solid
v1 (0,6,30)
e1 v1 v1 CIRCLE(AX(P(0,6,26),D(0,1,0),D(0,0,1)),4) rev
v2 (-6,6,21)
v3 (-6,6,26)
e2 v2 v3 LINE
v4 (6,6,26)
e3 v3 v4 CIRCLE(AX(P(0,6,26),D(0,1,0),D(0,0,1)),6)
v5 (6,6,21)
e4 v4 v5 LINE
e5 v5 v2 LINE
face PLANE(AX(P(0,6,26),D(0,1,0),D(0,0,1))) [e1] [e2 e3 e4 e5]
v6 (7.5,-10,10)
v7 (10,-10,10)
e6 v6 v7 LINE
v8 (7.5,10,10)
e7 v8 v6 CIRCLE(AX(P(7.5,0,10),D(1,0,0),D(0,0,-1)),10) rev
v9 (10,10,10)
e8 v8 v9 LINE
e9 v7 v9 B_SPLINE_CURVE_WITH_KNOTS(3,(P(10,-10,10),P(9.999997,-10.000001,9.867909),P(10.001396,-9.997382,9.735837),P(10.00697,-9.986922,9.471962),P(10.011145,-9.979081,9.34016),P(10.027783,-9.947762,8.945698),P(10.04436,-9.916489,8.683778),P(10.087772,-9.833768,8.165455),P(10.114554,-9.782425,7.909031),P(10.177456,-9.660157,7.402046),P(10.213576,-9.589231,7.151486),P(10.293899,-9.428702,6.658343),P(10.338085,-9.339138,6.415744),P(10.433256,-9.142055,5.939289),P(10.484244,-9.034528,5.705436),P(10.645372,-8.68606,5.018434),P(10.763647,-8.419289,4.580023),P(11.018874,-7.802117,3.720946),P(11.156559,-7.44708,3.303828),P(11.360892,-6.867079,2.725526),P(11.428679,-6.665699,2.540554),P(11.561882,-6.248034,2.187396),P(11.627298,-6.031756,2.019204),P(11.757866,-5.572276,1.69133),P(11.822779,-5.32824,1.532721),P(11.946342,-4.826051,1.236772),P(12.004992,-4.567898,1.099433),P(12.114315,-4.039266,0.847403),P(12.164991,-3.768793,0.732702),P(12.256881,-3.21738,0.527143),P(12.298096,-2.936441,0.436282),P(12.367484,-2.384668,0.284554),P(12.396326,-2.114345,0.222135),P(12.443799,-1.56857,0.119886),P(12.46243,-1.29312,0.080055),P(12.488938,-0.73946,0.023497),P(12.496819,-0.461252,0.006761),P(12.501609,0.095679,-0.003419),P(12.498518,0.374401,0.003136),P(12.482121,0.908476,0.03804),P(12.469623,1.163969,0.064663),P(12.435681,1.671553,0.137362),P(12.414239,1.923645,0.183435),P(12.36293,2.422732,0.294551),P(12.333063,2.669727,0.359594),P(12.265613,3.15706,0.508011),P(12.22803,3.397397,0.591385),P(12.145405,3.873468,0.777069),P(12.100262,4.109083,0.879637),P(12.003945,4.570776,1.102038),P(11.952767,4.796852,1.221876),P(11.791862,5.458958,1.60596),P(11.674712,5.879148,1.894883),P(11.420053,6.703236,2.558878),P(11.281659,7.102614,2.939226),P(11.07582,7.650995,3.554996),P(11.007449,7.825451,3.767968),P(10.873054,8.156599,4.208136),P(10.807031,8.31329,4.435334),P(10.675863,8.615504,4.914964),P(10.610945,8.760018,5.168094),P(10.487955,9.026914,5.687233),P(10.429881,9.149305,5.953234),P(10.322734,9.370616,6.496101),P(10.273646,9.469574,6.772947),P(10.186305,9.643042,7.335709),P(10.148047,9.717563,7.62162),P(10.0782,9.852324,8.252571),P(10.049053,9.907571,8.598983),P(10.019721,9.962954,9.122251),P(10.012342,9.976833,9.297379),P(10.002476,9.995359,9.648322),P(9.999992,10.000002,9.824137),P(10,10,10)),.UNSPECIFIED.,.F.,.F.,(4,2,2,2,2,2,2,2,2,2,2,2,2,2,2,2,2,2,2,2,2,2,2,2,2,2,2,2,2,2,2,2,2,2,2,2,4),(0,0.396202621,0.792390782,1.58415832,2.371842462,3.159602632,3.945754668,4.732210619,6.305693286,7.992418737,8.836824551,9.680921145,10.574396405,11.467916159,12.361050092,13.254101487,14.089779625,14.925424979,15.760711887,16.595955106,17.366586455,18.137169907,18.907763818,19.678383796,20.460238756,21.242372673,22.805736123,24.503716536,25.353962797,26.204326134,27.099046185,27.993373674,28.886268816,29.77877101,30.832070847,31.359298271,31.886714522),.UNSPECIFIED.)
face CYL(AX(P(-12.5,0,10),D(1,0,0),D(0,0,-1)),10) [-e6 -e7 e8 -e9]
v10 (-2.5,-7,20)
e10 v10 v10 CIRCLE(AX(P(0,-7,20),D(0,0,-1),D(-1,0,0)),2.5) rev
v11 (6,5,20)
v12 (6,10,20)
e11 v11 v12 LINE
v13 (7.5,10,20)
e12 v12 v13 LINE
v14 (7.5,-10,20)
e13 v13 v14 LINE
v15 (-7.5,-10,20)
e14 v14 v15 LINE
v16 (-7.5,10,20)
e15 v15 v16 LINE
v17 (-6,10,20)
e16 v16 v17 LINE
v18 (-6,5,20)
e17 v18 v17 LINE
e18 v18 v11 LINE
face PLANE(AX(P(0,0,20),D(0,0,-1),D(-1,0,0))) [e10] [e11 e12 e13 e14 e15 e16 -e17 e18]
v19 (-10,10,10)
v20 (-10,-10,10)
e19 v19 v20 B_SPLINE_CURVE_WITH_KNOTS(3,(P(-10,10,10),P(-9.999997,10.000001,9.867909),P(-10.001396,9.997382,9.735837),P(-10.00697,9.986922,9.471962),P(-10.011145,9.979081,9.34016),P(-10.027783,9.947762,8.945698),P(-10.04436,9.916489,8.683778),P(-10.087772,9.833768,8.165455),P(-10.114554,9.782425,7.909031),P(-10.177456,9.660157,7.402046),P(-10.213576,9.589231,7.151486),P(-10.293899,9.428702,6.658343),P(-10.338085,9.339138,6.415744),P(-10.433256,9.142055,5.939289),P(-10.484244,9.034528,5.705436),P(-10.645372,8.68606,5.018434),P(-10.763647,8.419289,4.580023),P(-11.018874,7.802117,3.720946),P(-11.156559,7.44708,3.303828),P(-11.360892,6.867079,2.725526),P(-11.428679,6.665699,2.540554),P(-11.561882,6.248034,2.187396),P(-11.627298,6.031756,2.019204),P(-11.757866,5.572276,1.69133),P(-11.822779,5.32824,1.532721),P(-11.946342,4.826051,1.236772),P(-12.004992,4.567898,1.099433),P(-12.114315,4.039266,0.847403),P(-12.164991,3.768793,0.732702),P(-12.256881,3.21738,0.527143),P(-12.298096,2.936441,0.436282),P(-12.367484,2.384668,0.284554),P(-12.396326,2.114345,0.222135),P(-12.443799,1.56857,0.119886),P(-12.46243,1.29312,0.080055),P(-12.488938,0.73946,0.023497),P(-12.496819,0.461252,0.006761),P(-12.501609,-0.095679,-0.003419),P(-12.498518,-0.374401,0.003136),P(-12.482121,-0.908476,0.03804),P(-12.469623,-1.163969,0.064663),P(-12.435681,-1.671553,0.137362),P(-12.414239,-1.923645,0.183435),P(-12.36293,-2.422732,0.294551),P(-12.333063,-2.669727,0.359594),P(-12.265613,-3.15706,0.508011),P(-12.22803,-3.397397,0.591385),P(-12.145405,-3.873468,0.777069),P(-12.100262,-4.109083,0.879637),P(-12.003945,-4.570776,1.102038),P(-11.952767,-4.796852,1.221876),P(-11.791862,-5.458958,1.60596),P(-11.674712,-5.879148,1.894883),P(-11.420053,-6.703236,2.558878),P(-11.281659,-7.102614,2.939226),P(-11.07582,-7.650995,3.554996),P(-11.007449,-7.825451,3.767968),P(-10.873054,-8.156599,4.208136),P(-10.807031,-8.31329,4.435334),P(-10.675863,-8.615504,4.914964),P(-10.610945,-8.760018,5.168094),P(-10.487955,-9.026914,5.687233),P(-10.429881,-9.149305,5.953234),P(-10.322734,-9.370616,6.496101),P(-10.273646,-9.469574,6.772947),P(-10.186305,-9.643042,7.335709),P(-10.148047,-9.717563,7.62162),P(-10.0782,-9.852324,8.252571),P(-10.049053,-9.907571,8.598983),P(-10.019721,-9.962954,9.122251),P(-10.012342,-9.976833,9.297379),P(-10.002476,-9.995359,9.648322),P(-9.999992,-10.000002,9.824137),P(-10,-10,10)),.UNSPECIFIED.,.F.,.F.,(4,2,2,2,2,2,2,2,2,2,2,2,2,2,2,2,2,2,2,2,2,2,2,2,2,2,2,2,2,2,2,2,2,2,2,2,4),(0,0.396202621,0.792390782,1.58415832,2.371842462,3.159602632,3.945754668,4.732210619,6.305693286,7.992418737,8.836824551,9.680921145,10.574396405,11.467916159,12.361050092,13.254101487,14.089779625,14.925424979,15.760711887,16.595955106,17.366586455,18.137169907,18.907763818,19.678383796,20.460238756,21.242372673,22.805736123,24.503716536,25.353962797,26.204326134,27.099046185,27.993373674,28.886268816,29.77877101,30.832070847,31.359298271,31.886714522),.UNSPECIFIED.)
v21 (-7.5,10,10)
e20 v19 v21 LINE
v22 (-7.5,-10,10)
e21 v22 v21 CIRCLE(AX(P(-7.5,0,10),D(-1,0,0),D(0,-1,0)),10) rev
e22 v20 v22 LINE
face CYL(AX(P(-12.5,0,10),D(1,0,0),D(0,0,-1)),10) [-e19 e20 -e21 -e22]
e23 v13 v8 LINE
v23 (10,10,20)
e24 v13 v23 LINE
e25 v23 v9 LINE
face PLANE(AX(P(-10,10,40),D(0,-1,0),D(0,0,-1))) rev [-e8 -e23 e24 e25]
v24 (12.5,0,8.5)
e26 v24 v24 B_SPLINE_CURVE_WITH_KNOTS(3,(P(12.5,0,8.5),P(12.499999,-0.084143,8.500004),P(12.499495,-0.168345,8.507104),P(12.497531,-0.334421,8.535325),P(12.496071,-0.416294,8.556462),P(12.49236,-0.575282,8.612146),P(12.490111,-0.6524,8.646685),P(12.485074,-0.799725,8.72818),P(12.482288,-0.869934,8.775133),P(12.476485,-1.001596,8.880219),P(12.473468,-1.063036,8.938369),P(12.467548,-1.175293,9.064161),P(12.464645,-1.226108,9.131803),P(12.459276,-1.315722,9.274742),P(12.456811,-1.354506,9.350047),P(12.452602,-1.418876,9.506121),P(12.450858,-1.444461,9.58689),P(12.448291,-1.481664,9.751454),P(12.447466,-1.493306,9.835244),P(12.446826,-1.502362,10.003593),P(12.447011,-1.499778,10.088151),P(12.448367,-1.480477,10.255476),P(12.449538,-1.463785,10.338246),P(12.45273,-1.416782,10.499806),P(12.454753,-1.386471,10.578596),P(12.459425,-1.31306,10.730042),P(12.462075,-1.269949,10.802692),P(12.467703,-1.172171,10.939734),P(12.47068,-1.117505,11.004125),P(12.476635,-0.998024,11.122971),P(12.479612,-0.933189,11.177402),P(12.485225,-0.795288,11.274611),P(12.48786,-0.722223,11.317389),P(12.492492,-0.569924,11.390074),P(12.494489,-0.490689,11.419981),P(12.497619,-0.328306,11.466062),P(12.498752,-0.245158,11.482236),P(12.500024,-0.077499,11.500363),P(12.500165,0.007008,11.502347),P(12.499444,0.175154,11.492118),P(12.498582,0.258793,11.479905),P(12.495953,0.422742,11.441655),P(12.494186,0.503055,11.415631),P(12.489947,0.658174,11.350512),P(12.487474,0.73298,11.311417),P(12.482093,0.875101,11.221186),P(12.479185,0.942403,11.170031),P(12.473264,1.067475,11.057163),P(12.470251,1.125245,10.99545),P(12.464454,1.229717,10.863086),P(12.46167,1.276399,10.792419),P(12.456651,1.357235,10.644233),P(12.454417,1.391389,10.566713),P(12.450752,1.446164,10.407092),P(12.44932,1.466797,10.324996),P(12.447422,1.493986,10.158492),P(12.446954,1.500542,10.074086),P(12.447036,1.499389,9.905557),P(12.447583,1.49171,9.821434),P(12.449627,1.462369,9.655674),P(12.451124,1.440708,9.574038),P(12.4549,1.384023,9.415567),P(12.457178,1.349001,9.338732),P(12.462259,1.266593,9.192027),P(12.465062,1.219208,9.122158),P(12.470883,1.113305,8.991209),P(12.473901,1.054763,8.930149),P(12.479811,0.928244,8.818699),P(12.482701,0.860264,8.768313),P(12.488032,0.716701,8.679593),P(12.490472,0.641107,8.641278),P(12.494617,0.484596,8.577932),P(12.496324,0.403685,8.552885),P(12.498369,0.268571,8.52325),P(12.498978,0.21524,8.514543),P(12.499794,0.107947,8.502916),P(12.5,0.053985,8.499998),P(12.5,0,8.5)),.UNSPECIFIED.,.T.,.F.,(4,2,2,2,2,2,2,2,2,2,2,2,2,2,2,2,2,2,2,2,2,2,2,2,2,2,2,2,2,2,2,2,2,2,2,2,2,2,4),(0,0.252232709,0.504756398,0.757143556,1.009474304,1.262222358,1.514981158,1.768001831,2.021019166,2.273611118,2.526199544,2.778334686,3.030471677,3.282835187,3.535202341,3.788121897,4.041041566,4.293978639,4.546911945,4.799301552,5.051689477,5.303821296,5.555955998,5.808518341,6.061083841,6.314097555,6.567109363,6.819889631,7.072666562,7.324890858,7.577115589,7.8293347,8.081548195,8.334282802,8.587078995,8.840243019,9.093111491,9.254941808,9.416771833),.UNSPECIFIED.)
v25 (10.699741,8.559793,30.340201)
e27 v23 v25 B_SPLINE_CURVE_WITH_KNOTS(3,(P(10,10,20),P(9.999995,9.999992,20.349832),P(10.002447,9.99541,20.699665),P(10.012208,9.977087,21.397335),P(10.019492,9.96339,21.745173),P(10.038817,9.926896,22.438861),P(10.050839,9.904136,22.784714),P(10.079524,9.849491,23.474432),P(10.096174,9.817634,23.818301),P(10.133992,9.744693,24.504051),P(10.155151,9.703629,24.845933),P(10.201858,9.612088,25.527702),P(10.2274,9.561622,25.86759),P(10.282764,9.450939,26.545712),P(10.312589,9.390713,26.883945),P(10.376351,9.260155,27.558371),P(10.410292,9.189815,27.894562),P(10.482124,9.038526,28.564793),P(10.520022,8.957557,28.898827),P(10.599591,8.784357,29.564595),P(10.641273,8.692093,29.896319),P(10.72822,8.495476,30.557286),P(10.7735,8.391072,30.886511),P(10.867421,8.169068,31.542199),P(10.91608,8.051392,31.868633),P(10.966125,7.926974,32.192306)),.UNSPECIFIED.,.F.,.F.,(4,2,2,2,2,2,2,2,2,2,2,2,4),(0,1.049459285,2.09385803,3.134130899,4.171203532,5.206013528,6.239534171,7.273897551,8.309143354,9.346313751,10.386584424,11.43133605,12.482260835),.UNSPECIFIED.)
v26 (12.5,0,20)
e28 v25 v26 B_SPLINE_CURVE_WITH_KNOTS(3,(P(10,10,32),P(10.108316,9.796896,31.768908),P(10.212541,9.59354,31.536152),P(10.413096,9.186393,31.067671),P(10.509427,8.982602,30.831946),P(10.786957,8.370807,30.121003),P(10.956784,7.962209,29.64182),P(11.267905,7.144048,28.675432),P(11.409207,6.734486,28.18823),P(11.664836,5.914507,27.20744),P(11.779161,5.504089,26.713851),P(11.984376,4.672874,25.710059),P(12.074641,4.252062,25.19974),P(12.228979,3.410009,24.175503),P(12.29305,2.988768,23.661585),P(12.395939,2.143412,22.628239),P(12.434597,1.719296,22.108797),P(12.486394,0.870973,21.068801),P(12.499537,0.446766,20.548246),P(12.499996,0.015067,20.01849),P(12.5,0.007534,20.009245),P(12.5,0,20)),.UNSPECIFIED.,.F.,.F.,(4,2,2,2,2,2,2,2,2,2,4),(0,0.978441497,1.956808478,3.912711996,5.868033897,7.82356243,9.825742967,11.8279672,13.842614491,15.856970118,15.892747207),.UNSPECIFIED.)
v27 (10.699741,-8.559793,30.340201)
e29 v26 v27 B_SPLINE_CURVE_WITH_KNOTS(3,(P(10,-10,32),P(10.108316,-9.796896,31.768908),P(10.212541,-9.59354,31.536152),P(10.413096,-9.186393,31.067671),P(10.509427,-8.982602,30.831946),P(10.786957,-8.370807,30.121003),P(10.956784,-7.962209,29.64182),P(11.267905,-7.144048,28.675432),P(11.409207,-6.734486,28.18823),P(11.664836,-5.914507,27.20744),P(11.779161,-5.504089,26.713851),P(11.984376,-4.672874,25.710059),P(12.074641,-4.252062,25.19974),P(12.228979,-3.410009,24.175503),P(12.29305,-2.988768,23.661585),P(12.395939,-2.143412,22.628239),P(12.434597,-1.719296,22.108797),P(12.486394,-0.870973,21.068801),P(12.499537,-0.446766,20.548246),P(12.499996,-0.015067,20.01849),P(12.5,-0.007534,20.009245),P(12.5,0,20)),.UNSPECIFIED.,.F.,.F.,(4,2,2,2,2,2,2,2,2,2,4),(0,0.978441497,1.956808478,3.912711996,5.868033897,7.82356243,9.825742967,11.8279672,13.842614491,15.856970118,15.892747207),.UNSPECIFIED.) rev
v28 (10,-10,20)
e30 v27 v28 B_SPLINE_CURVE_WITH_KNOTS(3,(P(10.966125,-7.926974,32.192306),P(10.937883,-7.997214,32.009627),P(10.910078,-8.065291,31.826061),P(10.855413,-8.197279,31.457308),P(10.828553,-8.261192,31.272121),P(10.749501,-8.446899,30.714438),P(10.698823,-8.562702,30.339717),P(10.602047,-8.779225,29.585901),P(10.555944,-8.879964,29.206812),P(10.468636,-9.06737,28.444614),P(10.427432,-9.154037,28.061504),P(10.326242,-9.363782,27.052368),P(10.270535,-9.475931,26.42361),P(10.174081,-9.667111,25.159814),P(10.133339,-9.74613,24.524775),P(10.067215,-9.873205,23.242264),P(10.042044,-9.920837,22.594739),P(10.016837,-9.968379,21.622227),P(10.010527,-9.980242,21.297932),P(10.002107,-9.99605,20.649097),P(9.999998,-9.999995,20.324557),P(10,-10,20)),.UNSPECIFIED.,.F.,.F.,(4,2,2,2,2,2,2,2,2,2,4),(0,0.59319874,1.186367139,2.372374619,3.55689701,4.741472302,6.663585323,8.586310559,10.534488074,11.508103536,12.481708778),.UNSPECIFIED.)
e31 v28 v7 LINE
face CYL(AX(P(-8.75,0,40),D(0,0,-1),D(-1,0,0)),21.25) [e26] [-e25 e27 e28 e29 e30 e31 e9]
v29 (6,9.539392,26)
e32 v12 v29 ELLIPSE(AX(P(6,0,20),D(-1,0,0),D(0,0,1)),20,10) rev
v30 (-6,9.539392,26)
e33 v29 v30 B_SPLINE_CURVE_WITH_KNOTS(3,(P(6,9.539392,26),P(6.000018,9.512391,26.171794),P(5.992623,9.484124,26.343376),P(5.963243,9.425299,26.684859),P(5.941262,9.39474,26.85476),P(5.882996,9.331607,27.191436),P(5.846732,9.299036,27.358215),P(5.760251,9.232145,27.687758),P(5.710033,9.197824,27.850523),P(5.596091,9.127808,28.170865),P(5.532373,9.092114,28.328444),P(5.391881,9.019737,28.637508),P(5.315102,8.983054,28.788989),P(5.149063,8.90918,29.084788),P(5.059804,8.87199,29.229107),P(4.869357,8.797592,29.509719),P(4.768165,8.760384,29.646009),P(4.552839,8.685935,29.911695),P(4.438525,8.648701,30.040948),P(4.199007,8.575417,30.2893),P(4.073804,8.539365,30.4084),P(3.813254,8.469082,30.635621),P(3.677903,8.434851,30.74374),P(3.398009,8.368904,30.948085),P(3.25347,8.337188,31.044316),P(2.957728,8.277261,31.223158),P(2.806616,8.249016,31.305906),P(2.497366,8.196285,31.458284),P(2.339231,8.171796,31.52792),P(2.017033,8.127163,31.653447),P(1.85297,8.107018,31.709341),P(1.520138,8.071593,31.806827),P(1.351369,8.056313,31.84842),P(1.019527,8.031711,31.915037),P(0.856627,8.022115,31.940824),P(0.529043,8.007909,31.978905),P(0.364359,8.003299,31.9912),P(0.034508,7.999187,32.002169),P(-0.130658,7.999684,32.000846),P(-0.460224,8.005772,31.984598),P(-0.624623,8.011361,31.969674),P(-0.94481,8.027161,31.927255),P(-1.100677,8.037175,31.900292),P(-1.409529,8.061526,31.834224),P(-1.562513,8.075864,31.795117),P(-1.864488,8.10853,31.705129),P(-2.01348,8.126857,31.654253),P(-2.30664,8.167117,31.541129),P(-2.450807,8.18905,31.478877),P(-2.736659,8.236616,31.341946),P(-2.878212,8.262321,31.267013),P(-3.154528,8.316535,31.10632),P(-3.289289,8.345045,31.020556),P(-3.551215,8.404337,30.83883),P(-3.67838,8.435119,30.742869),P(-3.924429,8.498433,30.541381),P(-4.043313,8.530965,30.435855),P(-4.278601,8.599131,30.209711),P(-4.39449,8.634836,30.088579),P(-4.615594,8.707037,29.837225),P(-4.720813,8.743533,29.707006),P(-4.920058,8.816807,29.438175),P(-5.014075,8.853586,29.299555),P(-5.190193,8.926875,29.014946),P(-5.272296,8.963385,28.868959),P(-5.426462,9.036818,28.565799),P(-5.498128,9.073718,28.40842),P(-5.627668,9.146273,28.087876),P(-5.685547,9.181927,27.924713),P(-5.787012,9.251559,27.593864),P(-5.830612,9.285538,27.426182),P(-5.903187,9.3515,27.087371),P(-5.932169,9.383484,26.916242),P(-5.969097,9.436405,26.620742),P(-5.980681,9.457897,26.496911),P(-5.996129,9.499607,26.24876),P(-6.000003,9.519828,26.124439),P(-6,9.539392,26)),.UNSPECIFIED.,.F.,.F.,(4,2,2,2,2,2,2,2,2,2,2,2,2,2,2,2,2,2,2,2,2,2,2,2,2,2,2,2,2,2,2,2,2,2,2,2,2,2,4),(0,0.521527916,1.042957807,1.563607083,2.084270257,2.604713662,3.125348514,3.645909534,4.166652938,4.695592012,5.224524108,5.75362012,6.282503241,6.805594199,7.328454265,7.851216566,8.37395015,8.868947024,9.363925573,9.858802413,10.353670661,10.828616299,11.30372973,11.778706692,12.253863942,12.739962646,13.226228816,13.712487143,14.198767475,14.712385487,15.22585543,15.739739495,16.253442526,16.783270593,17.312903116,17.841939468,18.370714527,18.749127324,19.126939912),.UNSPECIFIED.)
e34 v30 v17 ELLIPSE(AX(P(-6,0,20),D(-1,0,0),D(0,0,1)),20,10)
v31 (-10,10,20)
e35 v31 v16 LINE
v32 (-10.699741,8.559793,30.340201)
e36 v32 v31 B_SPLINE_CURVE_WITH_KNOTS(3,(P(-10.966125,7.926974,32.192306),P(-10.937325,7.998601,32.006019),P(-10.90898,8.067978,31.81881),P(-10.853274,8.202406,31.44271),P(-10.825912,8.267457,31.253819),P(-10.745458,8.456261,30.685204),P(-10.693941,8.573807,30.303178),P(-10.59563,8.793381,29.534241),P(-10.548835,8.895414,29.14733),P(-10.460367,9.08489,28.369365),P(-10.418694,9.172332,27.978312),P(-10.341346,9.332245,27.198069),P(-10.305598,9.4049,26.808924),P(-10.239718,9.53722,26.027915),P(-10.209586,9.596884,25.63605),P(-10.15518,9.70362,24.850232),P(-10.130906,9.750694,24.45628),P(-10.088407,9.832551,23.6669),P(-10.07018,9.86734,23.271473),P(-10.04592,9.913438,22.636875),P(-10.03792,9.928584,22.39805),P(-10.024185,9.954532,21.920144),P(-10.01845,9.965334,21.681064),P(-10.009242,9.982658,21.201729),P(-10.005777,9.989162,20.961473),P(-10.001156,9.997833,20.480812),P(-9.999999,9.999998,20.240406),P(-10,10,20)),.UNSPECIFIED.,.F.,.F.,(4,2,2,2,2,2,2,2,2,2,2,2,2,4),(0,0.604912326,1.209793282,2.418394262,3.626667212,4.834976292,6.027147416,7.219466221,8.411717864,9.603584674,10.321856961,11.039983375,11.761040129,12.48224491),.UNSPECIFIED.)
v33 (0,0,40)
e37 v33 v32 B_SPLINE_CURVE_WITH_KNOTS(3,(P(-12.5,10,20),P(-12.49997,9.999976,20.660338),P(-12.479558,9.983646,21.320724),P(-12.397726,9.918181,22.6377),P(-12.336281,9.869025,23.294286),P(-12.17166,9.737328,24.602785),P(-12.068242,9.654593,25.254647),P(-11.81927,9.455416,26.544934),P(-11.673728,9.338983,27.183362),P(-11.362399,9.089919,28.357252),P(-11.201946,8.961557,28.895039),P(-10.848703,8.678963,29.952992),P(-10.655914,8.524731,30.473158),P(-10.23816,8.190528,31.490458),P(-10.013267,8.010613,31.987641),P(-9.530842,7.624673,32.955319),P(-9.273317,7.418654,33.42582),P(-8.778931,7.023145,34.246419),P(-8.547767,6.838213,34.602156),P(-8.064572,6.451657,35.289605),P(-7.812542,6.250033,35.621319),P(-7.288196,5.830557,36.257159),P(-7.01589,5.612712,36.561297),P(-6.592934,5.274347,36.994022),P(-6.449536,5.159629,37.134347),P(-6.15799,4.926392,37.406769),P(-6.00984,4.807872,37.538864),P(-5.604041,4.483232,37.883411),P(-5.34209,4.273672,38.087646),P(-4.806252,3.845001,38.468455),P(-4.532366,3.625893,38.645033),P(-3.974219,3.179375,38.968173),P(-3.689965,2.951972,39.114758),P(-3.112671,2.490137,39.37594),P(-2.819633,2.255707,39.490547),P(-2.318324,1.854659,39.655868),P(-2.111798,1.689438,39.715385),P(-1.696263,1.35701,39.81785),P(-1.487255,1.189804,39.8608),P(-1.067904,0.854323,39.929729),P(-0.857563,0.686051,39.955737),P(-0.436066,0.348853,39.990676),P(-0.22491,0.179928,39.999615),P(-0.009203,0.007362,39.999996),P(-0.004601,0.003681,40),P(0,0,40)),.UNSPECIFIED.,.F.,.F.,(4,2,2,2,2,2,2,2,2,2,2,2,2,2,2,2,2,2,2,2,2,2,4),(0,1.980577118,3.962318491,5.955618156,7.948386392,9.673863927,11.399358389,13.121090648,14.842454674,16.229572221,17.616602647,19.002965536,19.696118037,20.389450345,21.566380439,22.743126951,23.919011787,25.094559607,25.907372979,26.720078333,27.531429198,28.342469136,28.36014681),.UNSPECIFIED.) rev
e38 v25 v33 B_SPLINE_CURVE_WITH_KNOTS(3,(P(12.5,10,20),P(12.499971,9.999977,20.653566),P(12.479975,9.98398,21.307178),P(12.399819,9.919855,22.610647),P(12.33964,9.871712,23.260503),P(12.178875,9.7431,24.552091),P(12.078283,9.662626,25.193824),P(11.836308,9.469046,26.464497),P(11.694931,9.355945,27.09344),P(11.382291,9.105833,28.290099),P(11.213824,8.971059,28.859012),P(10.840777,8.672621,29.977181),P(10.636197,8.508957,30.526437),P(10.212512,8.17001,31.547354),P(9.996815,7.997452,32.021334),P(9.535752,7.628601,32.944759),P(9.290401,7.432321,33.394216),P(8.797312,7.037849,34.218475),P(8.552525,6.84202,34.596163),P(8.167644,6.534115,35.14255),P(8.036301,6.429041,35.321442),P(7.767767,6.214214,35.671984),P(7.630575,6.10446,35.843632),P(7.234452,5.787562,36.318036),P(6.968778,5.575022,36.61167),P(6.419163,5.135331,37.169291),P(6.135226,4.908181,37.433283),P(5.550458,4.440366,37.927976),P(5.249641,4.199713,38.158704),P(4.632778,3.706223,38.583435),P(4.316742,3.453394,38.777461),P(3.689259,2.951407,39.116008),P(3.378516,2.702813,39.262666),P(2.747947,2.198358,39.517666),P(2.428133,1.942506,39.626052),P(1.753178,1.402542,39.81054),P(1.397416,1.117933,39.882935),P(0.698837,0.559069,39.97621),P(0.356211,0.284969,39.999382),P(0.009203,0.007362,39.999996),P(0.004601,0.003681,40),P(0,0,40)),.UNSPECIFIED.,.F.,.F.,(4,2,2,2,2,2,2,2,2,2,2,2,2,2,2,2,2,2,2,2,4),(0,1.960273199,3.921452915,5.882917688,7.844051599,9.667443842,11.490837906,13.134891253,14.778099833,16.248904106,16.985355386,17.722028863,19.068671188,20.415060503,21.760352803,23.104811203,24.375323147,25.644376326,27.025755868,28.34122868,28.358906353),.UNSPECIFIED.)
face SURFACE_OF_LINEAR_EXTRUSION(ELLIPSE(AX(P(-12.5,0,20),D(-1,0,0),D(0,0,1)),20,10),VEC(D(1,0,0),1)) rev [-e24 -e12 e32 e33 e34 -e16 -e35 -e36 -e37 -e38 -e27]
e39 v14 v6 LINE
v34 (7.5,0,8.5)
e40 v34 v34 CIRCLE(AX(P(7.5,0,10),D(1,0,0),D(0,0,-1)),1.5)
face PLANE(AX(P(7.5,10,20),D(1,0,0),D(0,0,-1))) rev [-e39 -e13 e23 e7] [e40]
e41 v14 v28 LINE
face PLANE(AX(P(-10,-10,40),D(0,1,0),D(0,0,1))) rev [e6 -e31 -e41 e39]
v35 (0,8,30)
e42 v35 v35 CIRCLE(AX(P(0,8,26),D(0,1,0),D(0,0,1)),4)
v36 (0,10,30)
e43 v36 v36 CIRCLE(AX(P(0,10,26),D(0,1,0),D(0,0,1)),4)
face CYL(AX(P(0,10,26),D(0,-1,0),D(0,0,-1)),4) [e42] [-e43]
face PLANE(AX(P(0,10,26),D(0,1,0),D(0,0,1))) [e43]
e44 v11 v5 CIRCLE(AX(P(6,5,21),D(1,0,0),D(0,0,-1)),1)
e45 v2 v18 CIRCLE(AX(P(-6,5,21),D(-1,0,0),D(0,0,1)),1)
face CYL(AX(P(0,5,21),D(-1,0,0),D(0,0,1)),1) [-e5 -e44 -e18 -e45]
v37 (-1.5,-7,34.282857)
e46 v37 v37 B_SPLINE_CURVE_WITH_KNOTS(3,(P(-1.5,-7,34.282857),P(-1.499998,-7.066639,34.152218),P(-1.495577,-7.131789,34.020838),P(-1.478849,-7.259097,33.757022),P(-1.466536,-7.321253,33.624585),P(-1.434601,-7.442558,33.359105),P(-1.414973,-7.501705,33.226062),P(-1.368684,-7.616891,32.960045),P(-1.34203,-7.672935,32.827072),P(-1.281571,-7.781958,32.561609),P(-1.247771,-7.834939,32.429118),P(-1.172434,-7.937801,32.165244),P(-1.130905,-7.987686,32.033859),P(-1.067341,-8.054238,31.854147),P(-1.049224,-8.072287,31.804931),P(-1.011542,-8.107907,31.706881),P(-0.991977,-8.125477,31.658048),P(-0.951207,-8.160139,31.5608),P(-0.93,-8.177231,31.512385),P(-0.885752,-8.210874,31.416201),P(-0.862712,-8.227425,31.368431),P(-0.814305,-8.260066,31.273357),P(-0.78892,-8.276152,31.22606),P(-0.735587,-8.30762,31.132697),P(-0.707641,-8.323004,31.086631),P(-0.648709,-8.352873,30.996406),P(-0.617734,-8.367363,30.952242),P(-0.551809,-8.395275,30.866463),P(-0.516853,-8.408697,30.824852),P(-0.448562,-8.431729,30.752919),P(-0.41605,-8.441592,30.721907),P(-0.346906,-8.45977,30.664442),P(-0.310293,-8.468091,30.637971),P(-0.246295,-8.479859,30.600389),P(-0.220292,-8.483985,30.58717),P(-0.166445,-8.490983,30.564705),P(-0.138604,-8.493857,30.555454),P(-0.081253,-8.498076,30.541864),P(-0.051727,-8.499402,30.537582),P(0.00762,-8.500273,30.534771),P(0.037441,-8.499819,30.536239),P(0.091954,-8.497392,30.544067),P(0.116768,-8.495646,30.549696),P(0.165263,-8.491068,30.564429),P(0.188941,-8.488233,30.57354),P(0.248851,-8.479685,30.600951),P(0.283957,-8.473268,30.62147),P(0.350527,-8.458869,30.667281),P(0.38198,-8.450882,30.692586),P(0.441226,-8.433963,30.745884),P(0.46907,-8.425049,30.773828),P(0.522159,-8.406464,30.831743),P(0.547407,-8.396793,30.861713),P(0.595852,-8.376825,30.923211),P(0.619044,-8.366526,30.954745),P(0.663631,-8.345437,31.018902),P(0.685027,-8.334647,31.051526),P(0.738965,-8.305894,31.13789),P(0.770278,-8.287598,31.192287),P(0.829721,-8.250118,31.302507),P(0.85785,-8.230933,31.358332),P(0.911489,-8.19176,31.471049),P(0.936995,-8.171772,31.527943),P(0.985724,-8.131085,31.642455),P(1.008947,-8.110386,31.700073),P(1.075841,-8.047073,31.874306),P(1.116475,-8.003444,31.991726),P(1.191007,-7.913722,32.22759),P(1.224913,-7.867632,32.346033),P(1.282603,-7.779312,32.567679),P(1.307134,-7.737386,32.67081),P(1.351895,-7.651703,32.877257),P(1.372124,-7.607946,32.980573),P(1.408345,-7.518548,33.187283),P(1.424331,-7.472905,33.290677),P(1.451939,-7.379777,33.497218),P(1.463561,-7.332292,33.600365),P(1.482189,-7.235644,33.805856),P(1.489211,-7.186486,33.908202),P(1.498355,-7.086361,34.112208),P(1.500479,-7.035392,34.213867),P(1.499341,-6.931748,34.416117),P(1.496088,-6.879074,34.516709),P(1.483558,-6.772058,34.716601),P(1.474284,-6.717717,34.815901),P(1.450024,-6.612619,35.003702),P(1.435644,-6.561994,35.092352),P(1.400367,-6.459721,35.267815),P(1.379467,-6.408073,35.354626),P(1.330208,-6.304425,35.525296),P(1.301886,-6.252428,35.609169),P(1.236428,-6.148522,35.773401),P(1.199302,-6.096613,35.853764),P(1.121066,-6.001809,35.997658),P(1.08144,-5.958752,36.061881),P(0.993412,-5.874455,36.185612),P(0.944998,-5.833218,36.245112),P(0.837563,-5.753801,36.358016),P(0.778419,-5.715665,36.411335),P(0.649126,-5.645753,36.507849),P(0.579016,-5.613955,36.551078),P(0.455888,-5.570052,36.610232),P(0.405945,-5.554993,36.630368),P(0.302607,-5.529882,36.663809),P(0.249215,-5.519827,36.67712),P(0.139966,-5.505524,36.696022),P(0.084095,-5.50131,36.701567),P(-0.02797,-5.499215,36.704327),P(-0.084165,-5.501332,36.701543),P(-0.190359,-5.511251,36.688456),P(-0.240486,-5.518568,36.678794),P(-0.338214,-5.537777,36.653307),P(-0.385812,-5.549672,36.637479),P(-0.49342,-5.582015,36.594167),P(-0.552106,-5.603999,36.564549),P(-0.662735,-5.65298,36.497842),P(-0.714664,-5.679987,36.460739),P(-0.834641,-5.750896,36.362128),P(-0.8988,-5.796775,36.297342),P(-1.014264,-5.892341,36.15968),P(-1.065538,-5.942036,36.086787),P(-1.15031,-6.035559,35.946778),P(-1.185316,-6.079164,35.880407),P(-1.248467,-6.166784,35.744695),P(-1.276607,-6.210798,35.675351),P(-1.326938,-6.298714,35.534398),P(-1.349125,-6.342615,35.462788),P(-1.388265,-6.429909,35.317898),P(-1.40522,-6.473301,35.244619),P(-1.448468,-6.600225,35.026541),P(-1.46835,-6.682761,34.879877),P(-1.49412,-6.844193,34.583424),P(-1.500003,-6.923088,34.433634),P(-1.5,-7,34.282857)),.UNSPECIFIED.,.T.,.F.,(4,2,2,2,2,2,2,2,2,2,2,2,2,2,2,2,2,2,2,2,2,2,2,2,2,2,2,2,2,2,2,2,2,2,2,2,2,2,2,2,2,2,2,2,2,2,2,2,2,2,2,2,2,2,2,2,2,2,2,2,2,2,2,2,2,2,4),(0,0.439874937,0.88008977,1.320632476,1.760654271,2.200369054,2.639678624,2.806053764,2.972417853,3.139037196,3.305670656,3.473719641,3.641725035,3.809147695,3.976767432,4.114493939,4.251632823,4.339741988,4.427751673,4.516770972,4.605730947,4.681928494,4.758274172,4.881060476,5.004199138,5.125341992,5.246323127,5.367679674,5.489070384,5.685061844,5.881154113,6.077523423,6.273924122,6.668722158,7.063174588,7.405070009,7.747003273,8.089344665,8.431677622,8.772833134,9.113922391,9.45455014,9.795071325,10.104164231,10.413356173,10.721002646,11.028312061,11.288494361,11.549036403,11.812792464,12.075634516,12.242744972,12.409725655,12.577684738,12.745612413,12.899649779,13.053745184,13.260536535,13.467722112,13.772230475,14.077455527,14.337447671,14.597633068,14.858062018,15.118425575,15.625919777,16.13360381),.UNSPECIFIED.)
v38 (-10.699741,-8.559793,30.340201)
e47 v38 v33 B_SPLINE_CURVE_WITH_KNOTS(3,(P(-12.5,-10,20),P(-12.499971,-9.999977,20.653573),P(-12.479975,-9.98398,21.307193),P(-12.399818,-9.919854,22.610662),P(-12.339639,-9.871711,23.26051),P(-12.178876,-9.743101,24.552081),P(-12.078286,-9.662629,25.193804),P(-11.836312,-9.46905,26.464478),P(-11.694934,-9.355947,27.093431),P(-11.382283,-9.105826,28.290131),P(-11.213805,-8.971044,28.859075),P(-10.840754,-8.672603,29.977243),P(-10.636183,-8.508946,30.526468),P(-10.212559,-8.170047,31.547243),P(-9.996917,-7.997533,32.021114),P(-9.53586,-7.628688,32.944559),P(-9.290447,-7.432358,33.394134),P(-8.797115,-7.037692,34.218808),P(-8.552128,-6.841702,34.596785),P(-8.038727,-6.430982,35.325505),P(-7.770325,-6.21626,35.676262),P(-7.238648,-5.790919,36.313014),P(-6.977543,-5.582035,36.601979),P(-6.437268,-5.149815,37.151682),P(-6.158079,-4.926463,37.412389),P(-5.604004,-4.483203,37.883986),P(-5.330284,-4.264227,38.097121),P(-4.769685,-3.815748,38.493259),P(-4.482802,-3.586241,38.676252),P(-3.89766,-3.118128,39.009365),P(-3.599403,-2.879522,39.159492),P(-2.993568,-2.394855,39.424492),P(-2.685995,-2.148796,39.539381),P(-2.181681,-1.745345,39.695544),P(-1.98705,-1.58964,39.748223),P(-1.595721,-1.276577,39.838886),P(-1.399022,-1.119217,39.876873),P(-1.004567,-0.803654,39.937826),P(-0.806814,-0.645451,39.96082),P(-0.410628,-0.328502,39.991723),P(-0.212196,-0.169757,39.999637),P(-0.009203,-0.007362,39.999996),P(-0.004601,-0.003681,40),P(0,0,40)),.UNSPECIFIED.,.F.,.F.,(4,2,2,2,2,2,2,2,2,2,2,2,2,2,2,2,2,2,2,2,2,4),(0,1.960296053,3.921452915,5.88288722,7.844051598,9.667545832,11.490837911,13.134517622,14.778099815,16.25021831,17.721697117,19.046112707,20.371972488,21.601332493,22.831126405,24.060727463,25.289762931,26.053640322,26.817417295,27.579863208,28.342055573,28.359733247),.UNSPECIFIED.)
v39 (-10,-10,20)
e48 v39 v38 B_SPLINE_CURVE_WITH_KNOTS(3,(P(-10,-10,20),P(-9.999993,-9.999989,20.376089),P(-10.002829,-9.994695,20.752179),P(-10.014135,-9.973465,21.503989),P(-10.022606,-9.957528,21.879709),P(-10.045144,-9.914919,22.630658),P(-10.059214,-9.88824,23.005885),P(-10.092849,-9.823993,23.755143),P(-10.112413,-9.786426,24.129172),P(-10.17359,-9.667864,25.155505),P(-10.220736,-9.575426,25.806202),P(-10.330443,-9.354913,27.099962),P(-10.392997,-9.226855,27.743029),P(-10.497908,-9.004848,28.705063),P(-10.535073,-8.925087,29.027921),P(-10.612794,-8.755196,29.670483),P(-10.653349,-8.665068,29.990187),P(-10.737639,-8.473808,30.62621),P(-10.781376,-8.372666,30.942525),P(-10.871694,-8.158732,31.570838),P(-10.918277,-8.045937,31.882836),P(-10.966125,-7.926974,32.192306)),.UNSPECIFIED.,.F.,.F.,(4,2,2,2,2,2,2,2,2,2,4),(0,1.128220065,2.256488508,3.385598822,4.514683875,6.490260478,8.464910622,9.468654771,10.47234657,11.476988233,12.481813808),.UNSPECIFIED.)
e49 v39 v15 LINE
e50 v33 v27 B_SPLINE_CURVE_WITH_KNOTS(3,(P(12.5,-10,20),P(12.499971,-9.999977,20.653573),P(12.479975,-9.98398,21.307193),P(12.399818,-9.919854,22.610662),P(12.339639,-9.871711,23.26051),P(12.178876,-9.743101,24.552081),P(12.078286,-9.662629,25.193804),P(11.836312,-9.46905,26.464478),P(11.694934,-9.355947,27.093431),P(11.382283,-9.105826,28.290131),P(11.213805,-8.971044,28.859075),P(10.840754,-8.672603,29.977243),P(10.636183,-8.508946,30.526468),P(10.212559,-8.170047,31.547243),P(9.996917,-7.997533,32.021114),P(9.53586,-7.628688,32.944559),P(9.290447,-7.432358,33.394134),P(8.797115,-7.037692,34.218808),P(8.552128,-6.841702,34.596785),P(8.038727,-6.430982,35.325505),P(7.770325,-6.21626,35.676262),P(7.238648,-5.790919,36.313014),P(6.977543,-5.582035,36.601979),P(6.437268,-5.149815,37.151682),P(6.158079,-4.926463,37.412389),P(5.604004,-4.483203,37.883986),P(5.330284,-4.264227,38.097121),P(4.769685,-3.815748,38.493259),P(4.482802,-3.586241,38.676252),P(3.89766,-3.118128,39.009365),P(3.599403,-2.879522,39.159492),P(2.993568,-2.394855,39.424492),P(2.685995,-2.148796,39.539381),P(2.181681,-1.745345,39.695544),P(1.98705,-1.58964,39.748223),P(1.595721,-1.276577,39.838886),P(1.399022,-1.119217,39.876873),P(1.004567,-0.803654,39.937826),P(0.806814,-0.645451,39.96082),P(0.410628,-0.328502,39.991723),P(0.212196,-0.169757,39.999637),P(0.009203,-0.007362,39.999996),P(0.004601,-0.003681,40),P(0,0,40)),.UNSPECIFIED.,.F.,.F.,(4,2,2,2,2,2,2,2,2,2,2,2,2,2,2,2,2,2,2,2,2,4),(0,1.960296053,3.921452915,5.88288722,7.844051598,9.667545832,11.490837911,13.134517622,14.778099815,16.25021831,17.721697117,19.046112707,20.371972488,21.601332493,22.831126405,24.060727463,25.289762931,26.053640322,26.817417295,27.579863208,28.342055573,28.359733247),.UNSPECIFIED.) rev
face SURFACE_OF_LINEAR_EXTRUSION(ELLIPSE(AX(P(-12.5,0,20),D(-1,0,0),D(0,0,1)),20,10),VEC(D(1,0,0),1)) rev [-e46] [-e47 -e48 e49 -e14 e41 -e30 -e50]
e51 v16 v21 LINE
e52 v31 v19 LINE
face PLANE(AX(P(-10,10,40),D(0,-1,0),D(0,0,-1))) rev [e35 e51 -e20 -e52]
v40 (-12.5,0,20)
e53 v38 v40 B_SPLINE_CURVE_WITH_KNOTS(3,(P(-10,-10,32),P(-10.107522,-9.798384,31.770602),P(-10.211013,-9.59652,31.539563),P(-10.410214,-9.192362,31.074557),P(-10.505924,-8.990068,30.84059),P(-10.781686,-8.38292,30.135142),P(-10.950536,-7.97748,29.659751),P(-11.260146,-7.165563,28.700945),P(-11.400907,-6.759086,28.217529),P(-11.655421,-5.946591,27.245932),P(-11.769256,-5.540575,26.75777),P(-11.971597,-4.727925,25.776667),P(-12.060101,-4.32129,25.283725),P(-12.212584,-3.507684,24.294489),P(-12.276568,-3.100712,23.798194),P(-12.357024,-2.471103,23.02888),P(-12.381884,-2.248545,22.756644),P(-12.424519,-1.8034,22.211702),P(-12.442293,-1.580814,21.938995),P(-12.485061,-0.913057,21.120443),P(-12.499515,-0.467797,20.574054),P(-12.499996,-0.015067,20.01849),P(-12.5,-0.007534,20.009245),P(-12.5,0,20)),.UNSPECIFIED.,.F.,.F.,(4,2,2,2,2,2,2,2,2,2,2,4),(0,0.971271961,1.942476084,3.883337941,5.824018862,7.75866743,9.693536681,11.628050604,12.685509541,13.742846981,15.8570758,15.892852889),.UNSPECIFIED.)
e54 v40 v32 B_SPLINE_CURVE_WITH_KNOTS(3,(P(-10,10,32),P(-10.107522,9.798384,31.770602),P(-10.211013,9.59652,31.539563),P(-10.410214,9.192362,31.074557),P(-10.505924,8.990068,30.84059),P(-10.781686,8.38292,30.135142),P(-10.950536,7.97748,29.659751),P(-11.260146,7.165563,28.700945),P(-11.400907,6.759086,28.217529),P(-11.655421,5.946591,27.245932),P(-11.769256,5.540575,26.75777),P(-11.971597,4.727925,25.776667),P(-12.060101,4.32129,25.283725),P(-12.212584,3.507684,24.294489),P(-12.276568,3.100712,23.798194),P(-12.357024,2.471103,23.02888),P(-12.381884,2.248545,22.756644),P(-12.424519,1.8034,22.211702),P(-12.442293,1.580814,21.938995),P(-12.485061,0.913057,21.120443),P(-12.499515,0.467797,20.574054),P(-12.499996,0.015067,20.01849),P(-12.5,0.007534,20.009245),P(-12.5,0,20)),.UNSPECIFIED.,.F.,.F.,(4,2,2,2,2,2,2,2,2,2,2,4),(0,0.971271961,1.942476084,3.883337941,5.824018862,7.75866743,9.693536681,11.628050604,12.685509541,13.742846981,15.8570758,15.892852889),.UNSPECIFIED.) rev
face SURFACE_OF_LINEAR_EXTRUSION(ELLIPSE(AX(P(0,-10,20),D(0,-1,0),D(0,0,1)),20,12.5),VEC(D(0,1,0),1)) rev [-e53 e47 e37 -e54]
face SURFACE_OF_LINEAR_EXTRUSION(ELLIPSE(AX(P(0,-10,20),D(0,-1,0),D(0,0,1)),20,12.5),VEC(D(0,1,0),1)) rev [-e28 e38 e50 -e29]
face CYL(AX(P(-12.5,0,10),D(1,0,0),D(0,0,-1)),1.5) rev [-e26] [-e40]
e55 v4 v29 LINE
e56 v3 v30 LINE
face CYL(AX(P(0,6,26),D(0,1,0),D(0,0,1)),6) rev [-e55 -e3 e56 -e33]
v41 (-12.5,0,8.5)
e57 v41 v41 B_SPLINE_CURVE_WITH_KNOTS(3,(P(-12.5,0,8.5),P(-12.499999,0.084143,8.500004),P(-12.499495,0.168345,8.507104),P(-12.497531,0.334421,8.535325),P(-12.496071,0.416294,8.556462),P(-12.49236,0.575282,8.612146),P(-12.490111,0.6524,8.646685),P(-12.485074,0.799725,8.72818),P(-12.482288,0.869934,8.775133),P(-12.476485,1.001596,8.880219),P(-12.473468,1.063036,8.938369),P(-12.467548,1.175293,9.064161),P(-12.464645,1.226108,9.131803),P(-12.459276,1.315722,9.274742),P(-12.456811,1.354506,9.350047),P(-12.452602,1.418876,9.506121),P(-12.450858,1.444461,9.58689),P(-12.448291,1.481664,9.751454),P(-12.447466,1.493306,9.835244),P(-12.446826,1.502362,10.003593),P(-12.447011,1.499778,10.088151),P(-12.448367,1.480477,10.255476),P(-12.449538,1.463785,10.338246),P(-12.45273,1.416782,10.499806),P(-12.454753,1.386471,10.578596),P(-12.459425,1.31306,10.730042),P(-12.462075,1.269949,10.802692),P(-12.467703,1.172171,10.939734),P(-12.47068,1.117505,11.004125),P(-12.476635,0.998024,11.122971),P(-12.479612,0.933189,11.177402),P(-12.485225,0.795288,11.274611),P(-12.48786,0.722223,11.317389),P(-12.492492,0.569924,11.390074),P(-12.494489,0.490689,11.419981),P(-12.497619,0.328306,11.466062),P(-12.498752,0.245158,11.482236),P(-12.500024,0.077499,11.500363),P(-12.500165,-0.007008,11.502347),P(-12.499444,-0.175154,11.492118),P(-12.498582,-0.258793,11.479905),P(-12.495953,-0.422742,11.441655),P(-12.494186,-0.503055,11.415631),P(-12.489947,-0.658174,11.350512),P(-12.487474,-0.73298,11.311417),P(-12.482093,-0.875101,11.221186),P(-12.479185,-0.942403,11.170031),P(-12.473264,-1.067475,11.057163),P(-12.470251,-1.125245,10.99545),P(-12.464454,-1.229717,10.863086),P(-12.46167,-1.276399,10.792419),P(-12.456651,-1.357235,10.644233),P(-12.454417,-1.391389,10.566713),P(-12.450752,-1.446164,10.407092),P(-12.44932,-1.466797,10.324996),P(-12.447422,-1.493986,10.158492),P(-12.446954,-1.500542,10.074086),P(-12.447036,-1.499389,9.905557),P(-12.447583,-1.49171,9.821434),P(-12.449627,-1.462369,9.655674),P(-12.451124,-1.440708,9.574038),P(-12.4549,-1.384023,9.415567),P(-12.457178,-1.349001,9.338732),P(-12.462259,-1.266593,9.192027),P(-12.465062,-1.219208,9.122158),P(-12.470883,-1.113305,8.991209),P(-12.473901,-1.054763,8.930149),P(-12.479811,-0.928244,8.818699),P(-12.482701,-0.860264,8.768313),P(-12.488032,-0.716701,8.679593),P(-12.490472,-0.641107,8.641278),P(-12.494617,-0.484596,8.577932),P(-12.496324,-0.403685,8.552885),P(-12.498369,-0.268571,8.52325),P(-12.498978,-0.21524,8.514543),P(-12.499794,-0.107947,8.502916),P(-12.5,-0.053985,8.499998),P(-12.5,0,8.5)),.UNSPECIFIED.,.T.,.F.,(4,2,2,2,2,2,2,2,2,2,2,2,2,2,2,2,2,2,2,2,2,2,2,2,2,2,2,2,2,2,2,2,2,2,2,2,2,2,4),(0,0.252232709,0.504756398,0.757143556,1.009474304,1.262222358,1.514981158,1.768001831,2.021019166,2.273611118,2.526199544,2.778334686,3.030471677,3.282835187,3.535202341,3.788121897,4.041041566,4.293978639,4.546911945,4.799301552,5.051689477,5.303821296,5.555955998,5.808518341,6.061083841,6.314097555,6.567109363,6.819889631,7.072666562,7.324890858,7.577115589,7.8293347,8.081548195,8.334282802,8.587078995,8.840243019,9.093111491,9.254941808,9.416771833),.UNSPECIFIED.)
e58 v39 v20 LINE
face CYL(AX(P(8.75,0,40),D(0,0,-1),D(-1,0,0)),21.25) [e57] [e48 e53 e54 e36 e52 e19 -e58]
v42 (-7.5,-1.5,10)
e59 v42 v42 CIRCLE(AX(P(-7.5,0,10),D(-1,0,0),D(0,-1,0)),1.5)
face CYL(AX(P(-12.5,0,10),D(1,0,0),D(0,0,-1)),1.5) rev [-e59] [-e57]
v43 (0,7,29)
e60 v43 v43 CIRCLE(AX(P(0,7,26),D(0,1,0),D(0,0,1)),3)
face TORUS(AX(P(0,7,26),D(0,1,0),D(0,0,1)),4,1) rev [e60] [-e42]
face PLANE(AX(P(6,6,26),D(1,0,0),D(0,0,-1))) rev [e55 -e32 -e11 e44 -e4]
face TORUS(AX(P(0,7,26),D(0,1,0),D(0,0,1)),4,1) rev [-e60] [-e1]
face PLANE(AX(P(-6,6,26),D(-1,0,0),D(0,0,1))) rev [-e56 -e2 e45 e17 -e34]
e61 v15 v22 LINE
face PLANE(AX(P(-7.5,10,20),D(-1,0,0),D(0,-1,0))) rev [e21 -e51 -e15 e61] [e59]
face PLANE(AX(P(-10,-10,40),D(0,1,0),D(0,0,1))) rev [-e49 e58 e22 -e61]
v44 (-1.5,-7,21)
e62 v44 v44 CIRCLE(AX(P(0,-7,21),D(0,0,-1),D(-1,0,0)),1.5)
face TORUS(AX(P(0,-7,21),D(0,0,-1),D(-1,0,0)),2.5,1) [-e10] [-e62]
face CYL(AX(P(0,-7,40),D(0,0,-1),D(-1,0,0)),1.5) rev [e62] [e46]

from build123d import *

# Parameters (mm, degrees)
SALIENTE_EXTRUIR1_DEPTH    = 40
CROQUIS3_R                 = 1.5
CORTAR_EXTRUIR2_DEPTH      = 40
CROQUIS2_W                 = 15
CROQUIS2_H                 = 20
CORTAR_EXTRUIR1_DEPTH      = 20
CORTAR_EXTRUIR3_DEPTH      = 44.084219849
CORTAR_EXTRUIR3_DEPTH_BACK = 44.084219849
CROQUIS4_R                 = 1.5
CORTAR_EXTRUIR4_DEPTH      = 44.08422
CORTAR_EXTRUIR4_DEPTH_BACK = 44.08422
CORTAR_EXTRUIR5_DEPTH      = 44.084220001
CORTAR_EXTRUIR5_DEPTH_BACK = 44.084220001
CUT_EXTRUDE1_DEPTH         = 4
SKETCH2_R                  = 3
BOSS_EXTRUDE1_DEPTH        = 2
SKETCH3_R                  = 4
BOSS_EXTRUDE2_DEPTH        = 2
FILLET1_R                  = 1
FILLET2_R                  = 1
FILLET3_R                  = 1


with BuildPart() as part:
    # Croquis1 → Saliente-Extruir1 (new body)
    with BuildSketch(Plane.XY):
        with BuildLine():
            Line((-10, 10), (10, 10))
            ThreePointArc((10, 10), (12.5, 0), (10, -10))
            Line((10, -10), (-10, -10))
            ThreePointArc((-10, -10), (-12.5, 0), (-10, 10))
        make_face()
    extrude(amount=SALIENTE_EXTRUIR1_DEPTH)

    # Croquis3 → Cortar-Extruir2 (cut)
    with BuildSketch(Plane(origin=(0, 0, 0), x_dir=(-1, 0, 0), z_dir=(0, 0, -1))):
        with Locations((0, -7)):
            Circle(CROQUIS3_R)
    extrude(amount=-CORTAR_EXTRUIR2_DEPTH, mode=Mode.SUBTRACT)

    # Croquis2 → Cortar-Extruir1 (cut)
    with BuildSketch(Plane(origin=(0, 0, 0), x_dir=(-1, 0, 0), z_dir=(0, 0, -1))):
        Rectangle(CROQUIS2_W, CROQUIS2_H)
    extrude(amount=-CORTAR_EXTRUIR1_DEPTH, mode=Mode.SUBTRACT)

    # Croquis4 → Cortar-Extruir3 (cut, two sides: drawn at the far end of the back side and taken through both)
    with BuildSketch(Plane(origin=(0, 0, 0), x_dir=(0, 0, -1), z_dir=(1, 0, 0)).offset(-CORTAR_EXTRUIR3_DEPTH_BACK)):
        with Locations((-10, 0)):
            Circle(CROQUIS4_R)
        with BuildLine():
            Line((-10, -10), (3, -10))
            Line((3, -10), (3, 10))
            Line((3, 10), (-10, 10))
            ThreePointArc((-10, 10), (0, 0), (-10, -10))
        make_face()
    extrude(amount=CORTAR_EXTRUIR3_DEPTH + CORTAR_EXTRUIR3_DEPTH_BACK, mode=Mode.SUBTRACT)

    # Croquis5 → Cortar-Extruir4 (cut, two sides: drawn at the far end of the back side and taken through both)
    with BuildSketch(Plane(origin=(0, 0, 0), x_dir=(1, 0, 0), z_dir=(0, 1, 0)).offset(-CORTAR_EXTRUIR4_DEPTH_BACK)):
        with BuildLine():
            Line((-12.5, -20), (-12.5, -42))
            Line((-12.5, -42), (12.5, -42))
            Line((12.5, -42), (12.5, -20))
            add(Edge.make_bspline(
                [(-12.5, -20), (-12.5, -40), (0, -40), (12.5, -40), (12.5, -20)],
                knots=[4.71238898, 4.71238898, 4.71238898, 6.283185307, 6.283185307, 7.853981634, 7.853981634, 7.853981634], degree=2, weights=[1, 0.707106781, 1, 0.707106781, 1]))
        make_face()
    extrude(amount=CORTAR_EXTRUIR4_DEPTH + CORTAR_EXTRUIR4_DEPTH_BACK, mode=Mode.SUBTRACT)

    # Croquis6 → Cortar-Extruir5 (cut, two sides: drawn at the far end of the back side and taken through both)
    with BuildSketch(Plane(origin=(0, 0, 0), x_dir=(0, 0, -1), z_dir=(1, 0, 0)).offset(-CORTAR_EXTRUIR5_DEPTH_BACK)):
        with BuildLine():
            Line((-20, 10), (-42, 10))
            Line((-42, 10), (-42, -10))
            Line((-42, -10), (-20, -10))
            add(Edge.make_bspline(
                [(-20, 10), (-40, 10), (-40, 0), (-40, -10), (-20, -10)],
                knots=[4.71238898, 4.71238898, 4.71238898, 6.283185307, 6.283185307, 7.853981634, 7.853981634, 7.853981634], degree=2, weights=[1, 0.707106781, 1, 0.707106781, 1]))
        make_face()
    extrude(amount=CORTAR_EXTRUIR5_DEPTH + CORTAR_EXTRUIR5_DEPTH_BACK, mode=Mode.SUBTRACT)

    # Sketch1 → Cut-Extrude1 (cut)
    with BuildSketch(Plane(origin=(0, 10, 0), x_dir=(1, 0, 0), z_dir=(0, 1, 0))):
        with BuildLine():
            Line((-6, -26), (-6, -20))
            Line((-6, -20), (6, -20))
            Line((6, -20), (6, -26))
            ThreePointArc((6, -26), (0, -32), (-6, -26))
        make_face()
    extrude(amount=-CUT_EXTRUDE1_DEPTH, mode=Mode.SUBTRACT)

    # Sketch2 → Boss-Extrude1 (add)
    with BuildSketch(Plane(origin=(0, 6, 0), x_dir=(1, 0, 0), z_dir=(0, 1, 0))):
        with Locations(Location((0, -26, 0), (0, 0, 270))):
            Circle(SKETCH2_R)
    extrude(amount=BOSS_EXTRUDE1_DEPTH)

    # Sketch3 → Boss-Extrude2 (add)
    with BuildSketch(Plane(origin=(0, 8, 0), x_dir=(1, 0, 0), z_dir=(0, 1, 0))):
        with Locations(Location((0, -26, 0), (0, 0, 270))):
            Circle(SKETCH3_R)
    extrude(amount=BOSS_EXTRUDE2_DEPTH)

    # Fillet1
    fillet1_edges = [part.edges().sort_by_distance(p)[0] for p in [
        (0, 6, 23),
        (0, 8, 23),
    ]]
    fillet(fillet1_edges, radius=FILLET1_R - 0.0001)  # a hair under: the kernel refuses the full size

    # Fillet2
    fillet2_edges = [part.edges().sort_by_distance(p)[0] for p in [
        (0, 6, 20),
    ]]
    fillet(fillet2_edges, radius=FILLET2_R)

    # Fillet3
    fillet3_edges = [part.edges().sort_by_distance(p)[0] for p in [
        (1.5, -7, 20),
    ]]
    fillet(fillet3_edges, radius=FILLET3_R)


solid = part.part
